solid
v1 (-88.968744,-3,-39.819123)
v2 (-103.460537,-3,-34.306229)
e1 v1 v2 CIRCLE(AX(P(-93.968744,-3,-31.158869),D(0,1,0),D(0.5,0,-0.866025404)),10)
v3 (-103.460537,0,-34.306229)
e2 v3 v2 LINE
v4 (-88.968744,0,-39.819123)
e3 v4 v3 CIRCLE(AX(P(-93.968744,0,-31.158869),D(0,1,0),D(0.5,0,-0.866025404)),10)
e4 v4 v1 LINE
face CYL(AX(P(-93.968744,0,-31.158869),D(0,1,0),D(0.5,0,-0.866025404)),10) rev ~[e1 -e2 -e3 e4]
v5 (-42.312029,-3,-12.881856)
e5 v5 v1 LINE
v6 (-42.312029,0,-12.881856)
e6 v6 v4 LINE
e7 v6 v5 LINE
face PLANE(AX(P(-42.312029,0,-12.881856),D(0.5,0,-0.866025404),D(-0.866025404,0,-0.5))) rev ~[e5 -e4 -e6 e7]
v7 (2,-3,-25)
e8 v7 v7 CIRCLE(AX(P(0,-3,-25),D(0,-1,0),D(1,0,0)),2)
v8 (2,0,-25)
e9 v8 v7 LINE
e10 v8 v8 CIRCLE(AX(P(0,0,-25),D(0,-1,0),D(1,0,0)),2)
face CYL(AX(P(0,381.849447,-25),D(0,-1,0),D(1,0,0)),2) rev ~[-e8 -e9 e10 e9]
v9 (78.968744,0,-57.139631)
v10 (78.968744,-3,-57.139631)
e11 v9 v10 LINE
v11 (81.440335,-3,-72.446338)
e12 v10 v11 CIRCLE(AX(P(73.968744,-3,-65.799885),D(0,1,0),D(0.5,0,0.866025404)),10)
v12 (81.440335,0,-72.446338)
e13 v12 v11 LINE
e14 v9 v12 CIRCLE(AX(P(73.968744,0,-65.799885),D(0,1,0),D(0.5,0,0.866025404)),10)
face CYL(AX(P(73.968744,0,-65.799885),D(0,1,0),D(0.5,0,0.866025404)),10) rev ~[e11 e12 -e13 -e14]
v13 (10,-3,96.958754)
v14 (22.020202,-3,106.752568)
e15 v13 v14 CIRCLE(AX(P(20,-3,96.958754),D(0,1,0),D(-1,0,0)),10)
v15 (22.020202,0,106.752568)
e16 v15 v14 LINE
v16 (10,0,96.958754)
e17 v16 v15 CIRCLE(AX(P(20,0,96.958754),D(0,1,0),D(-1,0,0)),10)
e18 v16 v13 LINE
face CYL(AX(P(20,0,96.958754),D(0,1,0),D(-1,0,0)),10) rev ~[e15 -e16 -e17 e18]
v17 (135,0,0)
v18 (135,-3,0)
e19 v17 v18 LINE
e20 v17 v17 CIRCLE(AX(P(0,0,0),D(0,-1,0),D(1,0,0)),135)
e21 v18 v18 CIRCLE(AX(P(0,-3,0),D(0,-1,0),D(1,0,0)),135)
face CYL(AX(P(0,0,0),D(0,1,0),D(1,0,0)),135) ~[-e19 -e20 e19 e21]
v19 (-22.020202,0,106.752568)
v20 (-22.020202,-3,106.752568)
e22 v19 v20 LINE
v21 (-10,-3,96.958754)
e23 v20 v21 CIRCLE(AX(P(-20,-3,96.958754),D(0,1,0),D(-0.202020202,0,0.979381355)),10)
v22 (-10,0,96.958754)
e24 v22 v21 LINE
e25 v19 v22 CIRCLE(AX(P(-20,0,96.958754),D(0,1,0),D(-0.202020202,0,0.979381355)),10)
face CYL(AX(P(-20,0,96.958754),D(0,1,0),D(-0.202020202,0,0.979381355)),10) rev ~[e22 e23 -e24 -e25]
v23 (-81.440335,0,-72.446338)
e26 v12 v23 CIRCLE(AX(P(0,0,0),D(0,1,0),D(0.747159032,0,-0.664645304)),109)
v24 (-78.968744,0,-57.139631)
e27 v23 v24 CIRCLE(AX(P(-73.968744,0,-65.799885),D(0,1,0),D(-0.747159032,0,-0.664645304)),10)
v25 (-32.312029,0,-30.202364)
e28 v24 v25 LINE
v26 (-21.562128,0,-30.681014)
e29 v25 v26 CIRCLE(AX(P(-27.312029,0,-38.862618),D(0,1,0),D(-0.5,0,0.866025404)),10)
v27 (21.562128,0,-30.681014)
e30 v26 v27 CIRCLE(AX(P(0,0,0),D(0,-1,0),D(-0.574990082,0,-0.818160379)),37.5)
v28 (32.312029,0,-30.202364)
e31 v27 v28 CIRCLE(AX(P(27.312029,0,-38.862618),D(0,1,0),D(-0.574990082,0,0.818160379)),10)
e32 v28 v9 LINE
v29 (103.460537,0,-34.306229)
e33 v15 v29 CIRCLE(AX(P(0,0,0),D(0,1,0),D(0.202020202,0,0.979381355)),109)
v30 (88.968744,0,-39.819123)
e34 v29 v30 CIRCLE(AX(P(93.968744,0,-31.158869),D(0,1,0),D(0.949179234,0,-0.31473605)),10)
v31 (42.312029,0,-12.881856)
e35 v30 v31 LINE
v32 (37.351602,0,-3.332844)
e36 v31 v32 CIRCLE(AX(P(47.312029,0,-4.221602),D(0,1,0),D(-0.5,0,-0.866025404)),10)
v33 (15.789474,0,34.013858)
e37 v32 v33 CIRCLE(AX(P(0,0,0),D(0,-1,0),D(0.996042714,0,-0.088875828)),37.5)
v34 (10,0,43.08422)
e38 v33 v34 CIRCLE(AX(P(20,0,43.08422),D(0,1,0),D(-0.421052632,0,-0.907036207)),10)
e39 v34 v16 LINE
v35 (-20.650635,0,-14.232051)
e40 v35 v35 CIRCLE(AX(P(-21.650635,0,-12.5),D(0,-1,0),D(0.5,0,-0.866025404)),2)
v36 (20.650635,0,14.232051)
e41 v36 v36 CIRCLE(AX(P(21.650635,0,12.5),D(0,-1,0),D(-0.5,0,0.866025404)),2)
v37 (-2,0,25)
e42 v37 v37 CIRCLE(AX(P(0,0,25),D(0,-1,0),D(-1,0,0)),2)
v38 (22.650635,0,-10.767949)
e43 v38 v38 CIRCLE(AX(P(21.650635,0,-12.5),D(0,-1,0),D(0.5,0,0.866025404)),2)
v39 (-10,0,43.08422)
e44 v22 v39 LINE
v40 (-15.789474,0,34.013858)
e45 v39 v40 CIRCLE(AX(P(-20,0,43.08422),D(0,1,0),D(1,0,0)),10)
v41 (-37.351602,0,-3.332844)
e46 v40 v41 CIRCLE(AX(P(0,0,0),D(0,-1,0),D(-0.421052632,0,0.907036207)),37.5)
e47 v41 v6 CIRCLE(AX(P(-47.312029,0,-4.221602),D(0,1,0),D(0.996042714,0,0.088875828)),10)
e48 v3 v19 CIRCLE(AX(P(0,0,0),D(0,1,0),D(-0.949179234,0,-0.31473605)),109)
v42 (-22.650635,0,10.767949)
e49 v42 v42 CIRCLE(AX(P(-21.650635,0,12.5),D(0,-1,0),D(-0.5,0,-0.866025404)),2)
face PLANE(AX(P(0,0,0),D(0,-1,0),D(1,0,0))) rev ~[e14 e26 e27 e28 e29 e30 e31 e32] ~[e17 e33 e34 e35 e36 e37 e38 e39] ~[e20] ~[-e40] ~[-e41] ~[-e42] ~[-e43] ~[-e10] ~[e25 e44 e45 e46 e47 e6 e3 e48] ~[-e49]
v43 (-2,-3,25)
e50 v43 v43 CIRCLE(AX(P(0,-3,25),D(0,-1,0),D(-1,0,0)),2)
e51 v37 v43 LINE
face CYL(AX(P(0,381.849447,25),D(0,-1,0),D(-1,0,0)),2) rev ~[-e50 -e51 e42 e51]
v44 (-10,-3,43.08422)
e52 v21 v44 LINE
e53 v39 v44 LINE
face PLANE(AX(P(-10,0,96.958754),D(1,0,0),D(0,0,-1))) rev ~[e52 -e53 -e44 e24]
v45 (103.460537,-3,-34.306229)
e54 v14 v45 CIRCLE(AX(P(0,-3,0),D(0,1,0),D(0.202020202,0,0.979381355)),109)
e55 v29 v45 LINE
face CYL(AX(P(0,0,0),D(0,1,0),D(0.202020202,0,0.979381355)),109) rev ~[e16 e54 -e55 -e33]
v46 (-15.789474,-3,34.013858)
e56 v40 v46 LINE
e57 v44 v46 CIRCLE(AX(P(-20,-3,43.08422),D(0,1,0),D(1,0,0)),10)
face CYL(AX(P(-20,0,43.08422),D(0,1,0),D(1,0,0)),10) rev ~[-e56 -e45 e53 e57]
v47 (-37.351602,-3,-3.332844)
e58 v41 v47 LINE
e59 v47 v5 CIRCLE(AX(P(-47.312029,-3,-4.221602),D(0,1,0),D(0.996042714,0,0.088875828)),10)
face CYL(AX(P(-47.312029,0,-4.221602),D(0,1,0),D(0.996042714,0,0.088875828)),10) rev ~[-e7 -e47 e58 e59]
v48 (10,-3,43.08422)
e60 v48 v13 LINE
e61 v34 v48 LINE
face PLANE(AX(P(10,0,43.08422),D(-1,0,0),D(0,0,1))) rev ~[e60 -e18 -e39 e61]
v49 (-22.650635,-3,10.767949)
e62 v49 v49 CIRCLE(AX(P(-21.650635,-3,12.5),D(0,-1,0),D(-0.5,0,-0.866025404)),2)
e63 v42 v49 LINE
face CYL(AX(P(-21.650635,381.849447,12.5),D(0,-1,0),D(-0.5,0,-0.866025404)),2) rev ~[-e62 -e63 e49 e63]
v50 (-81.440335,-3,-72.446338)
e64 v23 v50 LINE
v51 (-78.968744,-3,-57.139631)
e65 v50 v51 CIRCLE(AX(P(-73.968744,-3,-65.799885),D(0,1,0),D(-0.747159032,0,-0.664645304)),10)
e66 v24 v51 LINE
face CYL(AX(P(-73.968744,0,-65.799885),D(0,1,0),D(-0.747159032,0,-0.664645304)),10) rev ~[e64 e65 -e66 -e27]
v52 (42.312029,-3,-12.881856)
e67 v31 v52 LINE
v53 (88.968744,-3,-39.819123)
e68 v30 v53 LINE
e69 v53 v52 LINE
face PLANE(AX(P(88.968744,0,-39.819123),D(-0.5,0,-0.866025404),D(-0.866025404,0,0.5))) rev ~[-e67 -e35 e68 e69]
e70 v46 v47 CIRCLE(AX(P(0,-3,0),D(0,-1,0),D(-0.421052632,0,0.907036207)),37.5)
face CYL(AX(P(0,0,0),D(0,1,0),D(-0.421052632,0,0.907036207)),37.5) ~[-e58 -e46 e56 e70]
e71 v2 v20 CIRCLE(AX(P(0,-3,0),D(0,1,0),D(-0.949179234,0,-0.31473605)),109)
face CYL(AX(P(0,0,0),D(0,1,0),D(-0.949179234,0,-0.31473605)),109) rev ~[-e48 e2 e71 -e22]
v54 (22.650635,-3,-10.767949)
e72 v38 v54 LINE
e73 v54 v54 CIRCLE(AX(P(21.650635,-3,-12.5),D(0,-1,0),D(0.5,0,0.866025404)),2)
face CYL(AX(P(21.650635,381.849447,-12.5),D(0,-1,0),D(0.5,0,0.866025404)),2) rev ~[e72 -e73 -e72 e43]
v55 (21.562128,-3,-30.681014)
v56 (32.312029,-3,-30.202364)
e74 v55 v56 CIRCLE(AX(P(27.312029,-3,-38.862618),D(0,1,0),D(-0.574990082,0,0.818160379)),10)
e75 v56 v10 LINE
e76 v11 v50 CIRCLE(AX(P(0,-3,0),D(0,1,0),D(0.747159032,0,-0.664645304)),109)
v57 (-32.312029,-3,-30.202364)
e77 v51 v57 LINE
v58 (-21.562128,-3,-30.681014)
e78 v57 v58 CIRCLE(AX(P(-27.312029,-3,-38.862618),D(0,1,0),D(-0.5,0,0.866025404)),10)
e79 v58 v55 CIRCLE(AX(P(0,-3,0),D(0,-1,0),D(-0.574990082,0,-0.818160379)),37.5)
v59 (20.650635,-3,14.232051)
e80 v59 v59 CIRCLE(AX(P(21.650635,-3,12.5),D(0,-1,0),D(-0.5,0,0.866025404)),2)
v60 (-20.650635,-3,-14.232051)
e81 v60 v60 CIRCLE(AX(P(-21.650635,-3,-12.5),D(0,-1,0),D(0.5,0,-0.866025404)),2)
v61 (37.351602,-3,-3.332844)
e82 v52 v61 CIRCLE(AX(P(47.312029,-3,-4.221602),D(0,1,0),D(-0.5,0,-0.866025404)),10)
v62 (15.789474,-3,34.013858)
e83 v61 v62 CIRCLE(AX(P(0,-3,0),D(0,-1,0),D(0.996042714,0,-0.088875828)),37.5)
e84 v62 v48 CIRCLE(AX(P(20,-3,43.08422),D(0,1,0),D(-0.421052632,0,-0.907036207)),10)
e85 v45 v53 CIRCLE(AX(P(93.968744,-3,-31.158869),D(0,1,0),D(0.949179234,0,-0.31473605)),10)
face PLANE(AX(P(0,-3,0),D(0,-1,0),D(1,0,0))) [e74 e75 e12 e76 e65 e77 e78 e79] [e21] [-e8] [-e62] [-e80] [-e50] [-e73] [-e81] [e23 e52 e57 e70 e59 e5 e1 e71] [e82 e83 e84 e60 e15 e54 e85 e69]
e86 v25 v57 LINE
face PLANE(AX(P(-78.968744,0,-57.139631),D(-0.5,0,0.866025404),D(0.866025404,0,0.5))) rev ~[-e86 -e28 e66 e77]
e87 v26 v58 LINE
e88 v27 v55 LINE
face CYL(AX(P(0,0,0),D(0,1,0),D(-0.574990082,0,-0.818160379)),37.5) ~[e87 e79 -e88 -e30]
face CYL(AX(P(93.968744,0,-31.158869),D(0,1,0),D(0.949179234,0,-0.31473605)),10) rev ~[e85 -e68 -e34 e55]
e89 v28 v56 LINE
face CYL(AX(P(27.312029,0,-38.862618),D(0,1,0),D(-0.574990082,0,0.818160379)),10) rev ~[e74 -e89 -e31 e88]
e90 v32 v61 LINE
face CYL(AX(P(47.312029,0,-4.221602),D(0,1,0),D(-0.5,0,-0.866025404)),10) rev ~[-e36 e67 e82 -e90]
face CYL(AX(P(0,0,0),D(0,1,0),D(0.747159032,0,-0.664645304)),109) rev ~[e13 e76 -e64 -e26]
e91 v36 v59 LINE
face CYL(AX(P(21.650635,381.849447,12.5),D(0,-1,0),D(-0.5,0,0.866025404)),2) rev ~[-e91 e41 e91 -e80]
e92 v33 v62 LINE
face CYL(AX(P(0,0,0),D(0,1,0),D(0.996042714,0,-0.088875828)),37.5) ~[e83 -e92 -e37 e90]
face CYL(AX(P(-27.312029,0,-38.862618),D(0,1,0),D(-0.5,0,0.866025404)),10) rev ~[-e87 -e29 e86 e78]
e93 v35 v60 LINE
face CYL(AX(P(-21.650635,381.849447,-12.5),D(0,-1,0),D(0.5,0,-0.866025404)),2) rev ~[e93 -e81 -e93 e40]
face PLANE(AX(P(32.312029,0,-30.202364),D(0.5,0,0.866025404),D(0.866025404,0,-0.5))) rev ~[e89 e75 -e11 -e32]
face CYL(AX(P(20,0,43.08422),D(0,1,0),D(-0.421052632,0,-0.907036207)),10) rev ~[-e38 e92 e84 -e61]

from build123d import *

# Parameters (mm, degrees)
F0_R            = 135
F1_DEPTH        = 3
F3_D            = 4
F3_COPIES_COUNT = 6


# Not quite as in the source:
# - a pattern or mirror of a feature is missing from the dataset's text; its kind, count and spacing are read off the source's solid


with BuildPart() as f1:
    # F0 (on Front) → F1 (new body)
    with BuildSketch(Plane.XZ):
        Circle(F0_R)
        with BuildLine():
            Line((-78.968744185, -57.1396310965), (-32.3120288915, -30.2023639624))
            ThreePointArc((-32.3120288915, -30.2023639624), (-26.8672094621, -28.8725161151), (-21.5621280722, -30.6810142107))
            ThreePointArc((-21.5621280722, -30.6810142107), (0, -37.5), (21.5621280722, -30.6810142107))
            ThreePointArc((21.5621280722, -30.6810142107), (26.8672094621, -28.8725161151), (32.3120288915, -30.2023639624))
            Line((32.3120288915, -30.2023639624), (78.968744185, -57.1396310965))
            ThreePointArc((78.968744185, -57.1396310965), (83.8408747407, -64.2058216819), (81.4403345067, -72.4463381783))
            ThreePointArc((81.4403345067, -72.4463381783), (0, -109), (-81.4403345067, -72.4463381783))
            ThreePointArc((-81.4403345067, -72.4463381783), (-83.8408747407, -64.2058216819), (-78.968744185, -57.1396310965))
        make_face(mode=Mode.SUBTRACT)
        with BuildLine():
            ThreePointArc((-10, 43.084219849), (-11.5707276958, 37.7039439805), (-15.7894736842, 34.0138577756))
            ThreePointArc((-15.7894736842, 34.0138577756), (-32.4759526419, 18.75), (-37.3516017564, -3.3328435649))
            ThreePointArc((-37.3516017564, -3.3328435649), (-38.4379371579, -8.8314278655), (-42.3120288915, -12.8818558867))
            Line((-42.3120288915, -12.8818558867), (-88.968744185, -39.8191230209))
            ThreePointArc((-88.968744185, -39.8191230209), (-97.5243100178, -40.50541656), (-103.4605365269, -34.3062294864))
            ThreePointArc((-103.4605365269, -34.3062294864), (-94.3967690125, 54.5), (-22.0202020202, 106.7525676646))
            ThreePointArc((-22.0202020202, 106.7525676646), (-13.6834352771, 104.7112382419), (-10, 96.9587541174))
            Line((-10, 96.9587541174), (-10, 43.084219849))
        make_face(mode=Mode.SUBTRACT)
        with BuildLine():
            ThreePointArc((15.7894736842, 34.0138577756), (11.5707276958, 37.7039439805), (10, 43.084219849))
            Line((10, 43.084219849), (10, 96.9587541174))
            ThreePointArc((10, 96.9587541174), (13.6834352771, 104.7112382419), (22.0202020202, 106.7525676646))
            ThreePointArc((22.0202020202, 106.7525676646), (94.3967690125, 54.5), (103.4605365269, -34.3062294864))
            ThreePointArc((103.4605365269, -34.3062294864), (97.5243100178, -40.50541656), (88.968744185, -39.8191230209))
            Line((88.968744185, -39.8191230209), (42.3120288915, -12.8818558867))
            ThreePointArc((42.3120288915, -12.8818558867), (38.4379371579, -8.8314278655), (37.3516017564, -3.3328435649))
            ThreePointArc((37.3516017564, -3.3328435649), (32.4759526419, 18.75), (15.7894736842, 34.0138577756))
        make_face(mode=Mode.SUBTRACT)
    extrude(amount=F1_DEPTH)

    # F3 (through all)
    with Locations(Plane(origin=(0, 0, 0), x_dir=(1, 0, 0), z_dir=(0, 1, 0))):
        with Locations((0, -25)):
            f3 = Hole(F3_D / 2)

    # F3_copies: F3 ×6 about axis
    f3_copies_axis = Axis((0, 0, 0), (0, 1, 0))
    for i in range(1, F3_COPIES_COUNT):
        add(f3.rotate(f3_copies_axis, i * 360 / F3_COPIES_COUNT), mode=Mode.SUBTRACT)


solid = f1.part
